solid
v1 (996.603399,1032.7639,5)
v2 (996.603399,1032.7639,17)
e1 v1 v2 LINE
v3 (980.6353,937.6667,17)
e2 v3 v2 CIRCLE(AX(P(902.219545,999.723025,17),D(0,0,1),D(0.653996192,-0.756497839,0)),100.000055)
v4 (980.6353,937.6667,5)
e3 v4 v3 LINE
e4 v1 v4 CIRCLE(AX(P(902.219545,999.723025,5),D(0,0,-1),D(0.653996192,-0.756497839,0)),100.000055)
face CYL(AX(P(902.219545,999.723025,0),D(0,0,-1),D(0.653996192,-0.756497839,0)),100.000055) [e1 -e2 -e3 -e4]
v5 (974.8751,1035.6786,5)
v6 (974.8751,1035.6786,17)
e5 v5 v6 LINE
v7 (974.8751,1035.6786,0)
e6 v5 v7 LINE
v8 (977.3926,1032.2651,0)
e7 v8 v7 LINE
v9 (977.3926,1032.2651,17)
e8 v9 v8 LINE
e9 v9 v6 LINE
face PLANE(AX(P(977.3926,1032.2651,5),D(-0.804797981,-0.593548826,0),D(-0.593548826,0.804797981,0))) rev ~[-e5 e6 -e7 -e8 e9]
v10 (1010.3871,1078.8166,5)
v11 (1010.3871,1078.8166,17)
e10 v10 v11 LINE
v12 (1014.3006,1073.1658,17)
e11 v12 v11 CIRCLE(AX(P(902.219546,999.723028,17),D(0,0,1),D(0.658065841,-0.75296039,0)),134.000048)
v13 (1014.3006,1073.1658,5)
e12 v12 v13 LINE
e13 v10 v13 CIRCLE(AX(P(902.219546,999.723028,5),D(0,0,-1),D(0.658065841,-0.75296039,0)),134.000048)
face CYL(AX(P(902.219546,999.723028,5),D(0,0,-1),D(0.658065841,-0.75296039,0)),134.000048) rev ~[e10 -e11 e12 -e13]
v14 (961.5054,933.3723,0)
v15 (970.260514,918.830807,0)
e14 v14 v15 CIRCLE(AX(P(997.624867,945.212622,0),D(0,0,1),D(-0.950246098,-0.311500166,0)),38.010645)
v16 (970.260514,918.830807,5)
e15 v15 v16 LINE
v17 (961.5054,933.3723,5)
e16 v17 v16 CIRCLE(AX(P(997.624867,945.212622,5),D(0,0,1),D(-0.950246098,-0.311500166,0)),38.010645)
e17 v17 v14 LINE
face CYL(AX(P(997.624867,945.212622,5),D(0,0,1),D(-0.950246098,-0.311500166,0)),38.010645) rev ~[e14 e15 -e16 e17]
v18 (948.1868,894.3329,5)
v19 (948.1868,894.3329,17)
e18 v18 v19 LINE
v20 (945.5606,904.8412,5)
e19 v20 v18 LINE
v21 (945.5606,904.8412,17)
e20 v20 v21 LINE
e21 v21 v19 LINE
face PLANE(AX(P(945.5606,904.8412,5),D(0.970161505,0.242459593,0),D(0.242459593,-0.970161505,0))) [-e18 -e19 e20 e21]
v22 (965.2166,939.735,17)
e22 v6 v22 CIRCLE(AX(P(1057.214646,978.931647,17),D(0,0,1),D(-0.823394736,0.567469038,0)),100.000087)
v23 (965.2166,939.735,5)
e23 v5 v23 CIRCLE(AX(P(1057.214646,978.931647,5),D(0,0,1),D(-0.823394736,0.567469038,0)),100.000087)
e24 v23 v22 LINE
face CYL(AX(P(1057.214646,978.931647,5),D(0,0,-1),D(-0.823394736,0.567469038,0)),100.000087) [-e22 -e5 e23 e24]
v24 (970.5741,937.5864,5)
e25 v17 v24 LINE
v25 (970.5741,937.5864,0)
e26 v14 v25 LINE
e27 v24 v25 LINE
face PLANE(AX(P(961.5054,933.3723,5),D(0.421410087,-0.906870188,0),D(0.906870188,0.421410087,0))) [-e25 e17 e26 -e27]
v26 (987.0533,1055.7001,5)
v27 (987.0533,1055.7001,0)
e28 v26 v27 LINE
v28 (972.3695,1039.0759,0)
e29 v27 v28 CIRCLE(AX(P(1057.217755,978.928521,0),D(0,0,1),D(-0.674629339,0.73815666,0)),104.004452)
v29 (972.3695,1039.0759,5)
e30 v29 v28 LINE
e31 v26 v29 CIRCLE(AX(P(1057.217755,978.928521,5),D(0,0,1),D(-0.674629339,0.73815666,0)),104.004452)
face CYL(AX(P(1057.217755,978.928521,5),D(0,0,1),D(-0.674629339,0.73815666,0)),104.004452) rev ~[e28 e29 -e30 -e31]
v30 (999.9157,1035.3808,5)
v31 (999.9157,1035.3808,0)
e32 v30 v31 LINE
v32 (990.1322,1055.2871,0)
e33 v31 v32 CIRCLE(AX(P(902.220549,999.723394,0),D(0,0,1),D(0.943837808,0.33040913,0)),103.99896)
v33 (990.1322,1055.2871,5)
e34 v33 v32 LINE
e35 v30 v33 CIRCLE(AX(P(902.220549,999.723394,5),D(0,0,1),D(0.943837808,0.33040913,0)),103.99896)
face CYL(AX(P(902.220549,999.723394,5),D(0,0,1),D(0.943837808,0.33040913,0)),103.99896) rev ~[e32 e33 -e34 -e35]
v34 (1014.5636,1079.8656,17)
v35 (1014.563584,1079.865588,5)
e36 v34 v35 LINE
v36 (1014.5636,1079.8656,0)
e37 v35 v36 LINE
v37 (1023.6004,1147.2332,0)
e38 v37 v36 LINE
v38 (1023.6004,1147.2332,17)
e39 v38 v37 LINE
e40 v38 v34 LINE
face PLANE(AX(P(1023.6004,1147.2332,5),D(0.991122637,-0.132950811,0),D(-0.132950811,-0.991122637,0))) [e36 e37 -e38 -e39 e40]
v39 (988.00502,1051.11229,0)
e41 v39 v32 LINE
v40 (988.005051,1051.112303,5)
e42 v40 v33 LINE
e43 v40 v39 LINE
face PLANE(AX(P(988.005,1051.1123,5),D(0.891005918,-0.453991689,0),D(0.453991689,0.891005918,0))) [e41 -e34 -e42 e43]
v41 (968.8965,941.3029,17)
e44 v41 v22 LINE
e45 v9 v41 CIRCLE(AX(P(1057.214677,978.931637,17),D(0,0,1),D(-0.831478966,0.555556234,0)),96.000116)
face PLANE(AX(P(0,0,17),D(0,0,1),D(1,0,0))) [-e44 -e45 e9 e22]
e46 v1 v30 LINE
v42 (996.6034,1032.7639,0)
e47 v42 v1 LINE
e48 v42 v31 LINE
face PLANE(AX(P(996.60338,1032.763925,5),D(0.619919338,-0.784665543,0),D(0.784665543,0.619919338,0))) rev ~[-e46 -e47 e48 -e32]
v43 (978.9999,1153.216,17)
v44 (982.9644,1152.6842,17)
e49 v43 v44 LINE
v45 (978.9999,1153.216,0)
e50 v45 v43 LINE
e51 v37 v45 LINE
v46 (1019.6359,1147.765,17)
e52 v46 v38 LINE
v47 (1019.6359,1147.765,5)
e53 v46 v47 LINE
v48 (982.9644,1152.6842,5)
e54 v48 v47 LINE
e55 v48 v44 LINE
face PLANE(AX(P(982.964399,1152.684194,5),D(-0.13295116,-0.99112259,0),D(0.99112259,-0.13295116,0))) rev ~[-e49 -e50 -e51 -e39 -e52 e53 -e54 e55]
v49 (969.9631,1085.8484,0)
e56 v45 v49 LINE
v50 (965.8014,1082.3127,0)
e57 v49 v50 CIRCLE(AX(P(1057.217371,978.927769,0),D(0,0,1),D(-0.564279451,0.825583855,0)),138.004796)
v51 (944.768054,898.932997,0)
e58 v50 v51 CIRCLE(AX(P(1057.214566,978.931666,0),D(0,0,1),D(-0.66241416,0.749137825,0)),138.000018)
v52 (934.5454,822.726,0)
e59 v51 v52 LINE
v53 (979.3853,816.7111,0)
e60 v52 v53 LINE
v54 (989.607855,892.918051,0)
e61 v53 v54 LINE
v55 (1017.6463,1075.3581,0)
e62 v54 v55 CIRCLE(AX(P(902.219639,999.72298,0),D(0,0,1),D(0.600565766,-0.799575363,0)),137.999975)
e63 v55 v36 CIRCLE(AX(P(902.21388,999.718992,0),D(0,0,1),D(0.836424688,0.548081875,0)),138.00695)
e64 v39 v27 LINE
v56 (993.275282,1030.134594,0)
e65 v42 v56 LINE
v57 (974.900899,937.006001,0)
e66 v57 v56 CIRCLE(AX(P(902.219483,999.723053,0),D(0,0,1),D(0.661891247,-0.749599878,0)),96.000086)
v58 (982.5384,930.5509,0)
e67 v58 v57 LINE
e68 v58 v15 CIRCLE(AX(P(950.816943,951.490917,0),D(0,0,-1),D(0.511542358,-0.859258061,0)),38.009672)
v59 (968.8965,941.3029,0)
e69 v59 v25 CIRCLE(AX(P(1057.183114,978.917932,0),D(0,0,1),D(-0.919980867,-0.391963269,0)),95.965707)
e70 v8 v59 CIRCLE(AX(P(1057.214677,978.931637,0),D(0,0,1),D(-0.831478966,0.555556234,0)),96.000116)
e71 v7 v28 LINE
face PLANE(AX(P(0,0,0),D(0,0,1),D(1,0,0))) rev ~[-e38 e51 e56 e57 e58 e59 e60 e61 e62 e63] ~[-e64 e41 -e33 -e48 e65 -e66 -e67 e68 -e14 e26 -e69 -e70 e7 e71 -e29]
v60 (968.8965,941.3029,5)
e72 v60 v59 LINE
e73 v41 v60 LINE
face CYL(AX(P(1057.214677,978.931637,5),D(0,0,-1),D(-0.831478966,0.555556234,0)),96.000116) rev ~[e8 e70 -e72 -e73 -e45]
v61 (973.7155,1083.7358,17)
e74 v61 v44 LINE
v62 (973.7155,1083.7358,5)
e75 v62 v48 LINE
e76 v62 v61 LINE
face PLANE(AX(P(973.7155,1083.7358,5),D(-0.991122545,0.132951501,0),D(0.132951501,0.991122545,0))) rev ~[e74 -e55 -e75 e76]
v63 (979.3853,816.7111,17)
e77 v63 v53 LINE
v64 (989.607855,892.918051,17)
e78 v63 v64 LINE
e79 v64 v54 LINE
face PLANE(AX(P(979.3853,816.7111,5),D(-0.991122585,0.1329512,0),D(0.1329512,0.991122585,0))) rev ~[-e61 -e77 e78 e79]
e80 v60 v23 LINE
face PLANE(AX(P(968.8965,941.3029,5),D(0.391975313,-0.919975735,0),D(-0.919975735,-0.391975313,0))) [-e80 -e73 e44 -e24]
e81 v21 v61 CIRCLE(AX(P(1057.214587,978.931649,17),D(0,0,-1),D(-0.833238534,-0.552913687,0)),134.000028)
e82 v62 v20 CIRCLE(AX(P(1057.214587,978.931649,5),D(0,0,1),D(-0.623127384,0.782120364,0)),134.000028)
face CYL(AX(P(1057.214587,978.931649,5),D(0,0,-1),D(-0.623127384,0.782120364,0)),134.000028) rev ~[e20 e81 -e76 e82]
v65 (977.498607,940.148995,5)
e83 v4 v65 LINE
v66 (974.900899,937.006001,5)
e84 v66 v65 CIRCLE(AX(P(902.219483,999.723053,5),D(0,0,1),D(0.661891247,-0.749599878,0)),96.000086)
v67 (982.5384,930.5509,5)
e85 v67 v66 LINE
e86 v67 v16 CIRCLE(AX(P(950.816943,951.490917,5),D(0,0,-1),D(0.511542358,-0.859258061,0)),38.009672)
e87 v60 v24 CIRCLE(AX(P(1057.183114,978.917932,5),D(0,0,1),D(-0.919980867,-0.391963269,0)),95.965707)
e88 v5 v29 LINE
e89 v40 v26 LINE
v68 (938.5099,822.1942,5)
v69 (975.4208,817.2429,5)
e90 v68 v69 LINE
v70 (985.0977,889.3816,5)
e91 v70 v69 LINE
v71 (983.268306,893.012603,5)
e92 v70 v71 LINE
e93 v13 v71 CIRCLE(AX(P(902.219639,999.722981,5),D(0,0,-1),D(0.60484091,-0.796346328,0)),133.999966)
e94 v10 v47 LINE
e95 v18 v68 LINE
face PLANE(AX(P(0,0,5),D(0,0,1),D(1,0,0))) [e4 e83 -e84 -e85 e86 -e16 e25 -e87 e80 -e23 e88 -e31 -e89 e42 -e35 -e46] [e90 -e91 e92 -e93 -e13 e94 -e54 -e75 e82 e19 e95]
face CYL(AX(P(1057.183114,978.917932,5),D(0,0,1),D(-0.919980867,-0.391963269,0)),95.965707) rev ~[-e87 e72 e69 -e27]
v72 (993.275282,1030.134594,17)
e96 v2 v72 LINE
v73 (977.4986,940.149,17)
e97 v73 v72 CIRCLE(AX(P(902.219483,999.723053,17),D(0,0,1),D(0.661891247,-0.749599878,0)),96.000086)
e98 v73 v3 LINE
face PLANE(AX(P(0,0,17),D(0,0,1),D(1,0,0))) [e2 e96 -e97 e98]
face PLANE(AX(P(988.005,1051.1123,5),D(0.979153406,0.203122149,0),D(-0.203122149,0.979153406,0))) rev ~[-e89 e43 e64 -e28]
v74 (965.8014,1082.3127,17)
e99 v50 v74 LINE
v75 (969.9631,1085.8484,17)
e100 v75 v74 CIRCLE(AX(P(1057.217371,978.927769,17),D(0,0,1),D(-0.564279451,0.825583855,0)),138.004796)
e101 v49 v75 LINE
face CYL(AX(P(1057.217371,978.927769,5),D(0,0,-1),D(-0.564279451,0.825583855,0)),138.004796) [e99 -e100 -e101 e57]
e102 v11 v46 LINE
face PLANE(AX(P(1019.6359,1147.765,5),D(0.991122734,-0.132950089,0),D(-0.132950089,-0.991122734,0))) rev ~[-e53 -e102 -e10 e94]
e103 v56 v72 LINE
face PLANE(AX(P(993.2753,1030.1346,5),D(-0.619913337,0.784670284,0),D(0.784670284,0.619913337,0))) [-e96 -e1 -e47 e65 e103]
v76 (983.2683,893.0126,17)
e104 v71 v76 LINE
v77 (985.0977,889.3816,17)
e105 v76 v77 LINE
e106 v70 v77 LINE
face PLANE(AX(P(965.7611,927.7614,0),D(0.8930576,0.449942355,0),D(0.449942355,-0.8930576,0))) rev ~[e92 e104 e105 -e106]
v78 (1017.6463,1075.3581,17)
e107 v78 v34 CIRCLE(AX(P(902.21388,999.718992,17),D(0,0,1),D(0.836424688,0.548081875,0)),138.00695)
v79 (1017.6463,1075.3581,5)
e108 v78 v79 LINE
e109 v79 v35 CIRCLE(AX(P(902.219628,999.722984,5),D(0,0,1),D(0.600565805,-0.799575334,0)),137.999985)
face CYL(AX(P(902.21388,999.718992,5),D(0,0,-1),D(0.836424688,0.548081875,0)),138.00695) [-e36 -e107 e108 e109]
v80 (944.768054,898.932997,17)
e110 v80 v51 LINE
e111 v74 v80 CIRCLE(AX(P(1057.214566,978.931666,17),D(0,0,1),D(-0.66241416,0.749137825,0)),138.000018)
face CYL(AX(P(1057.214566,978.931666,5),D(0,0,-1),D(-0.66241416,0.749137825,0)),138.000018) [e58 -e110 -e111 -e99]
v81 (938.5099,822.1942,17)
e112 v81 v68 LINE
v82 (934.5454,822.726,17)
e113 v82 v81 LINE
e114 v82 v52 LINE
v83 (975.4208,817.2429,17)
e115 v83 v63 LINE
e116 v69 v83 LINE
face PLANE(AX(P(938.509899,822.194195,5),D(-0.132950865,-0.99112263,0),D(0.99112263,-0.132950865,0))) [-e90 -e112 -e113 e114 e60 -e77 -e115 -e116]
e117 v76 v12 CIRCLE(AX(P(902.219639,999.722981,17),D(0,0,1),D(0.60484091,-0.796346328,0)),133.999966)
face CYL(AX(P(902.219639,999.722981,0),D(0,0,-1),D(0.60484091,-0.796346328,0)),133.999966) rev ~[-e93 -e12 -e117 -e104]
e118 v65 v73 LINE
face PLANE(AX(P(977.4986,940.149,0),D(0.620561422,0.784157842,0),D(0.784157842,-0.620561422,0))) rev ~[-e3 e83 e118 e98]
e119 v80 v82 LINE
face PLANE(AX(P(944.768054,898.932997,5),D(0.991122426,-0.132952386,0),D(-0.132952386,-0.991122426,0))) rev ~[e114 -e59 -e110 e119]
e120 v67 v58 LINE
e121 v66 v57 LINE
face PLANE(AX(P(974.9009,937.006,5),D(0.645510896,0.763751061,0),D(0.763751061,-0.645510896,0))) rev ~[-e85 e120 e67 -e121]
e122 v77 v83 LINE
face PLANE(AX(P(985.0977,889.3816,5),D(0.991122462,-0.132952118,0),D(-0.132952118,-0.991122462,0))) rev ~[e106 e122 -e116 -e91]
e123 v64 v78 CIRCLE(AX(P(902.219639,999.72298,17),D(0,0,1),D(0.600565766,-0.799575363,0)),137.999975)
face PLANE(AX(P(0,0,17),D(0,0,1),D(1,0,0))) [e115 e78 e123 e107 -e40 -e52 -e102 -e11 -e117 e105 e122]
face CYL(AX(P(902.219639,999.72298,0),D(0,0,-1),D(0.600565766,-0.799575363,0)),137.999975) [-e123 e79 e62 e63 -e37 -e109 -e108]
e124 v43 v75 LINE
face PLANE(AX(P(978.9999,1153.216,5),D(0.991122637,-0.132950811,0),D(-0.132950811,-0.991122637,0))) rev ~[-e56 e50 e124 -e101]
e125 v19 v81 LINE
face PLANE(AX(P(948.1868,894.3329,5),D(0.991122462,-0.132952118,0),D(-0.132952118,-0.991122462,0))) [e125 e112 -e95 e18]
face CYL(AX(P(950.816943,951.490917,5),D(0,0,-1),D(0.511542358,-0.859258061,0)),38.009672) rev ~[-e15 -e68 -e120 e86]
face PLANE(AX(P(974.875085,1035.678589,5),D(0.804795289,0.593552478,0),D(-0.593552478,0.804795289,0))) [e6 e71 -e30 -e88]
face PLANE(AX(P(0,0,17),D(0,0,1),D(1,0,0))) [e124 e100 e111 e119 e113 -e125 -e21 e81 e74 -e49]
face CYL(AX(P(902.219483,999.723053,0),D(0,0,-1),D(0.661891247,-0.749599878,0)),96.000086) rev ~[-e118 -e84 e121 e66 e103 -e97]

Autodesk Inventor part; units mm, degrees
ref_plane "YZ Plane" through (0, 0, 0) normal (1, 0, 0) x (0, 1, 0)
ref_plane "XZ Plane" through (0, 0, 0) normal (0, 1, 0) x (-1, 0, 0)
ref_plane "XY Plane" through (0, 0, 0) normal (0, 0, 1) x (1, 0, 0)
sketch "Sketch1" plane through (0, 0, 0) normal (0, 0, 1) x (1, 0, 0)
  arc A0 (967.6192, 924.0732) -> (967.7873, 1075.2272) centre (902.2196, 999.723) ccw
  arc A1 (983.2683, 893.0126) -> (983.4428, 1106.3006) centre (902.2196, 999.723) ccw
  line L0 (965.7611, 927.7614) -> (985.0977, 889.3816)
  line L1 (966.6908, 925.9161) -> (1011.6908, 925.9161) construction
  arc A2 (985.0977, 889.3816) -> (985.2727, 1109.9327) centre (902.2196, 999.723) ccw
  line L2 (965.9281, 1071.5369) -> (985.2727, 1109.9327)
  arc A3 (965.7611, 927.7614) -> (965.9281, 1071.5369) centre (902.2196, 999.723) ccw
  line L3 (977.4986, 940.149) -> (980.6353, 937.6667)
  point P0 (0, 0)
  point P1 (983.9681, 893.1)
  point P2 (990.6031, 1100.4422)
  point P3 (968.1775, 1074.8866)
  dimension "d28" = 100
  dimension "d33" = 63.26
  dimension "d34" = 4
  dimension "d40" = 4
  dimension "d41" = 4
extrude "Extrusion6" add sketch "Sketch1" along normal blind 5
extrude "Extrusion7" add sketch "Sketch1" along normal blind 17 contours L3 A3 L2 A0 | A1 L2 A2 L0
sketch "Sketch5" plane through (0, 0, 5) normal (0, 0, 1) x (1, 0, 0)
  arc A0 (965.7611, 927.7614) -> (977.4986, 940.149) centre (902.2196, 999.723) ccw projected
  line L0 (965.7611, 927.7614) -> (970.2605, 918.8308)
  line L1 (965.7611, 927.7614) -> (983.2683, 893.0126) projected
  line L2 (977.4986, 940.149) -> (985.1361, 933.6938)
  arc A1 (965.7611, 927.7614) -> (977.4986, 940.149) centre (902.2196, 999.723) ccw
  arc A2 (965.7611, 927.7614) -> (974.9009, 937.006) centre (902.2196, 999.723) ccw
  line L3 (974.9009, 937.006) -> (982.5384, 930.5509)
  arc A3 (970.2605, 918.8308) -> (982.5384, 930.5509) centre (950.8165, 951.4915) ccw
  point P0 (0, 0)
  dimension "d42" = 10
  dimension "d43" = 10
  dimension "d46" = 13
  dimension "d47" = 10
extrude "Extrusion8" cut sketch "Sketch5" along normal through all both and the other way through all
sketch "Sketch6" plane through (0, 0, 5) normal (0, 0, 1) x (1, 0, 0)
  arc A0 (974.9009, 937.006) -> (965.9281, 1071.5369) centre (902.2196, 999.723) ccw projected
  arc A1 (985.0977, 889.3816) -> (985.2727, 1109.9327) centre (902.2196, 999.723) ccw projected
  line L0 (985.8441, 1046.8712) -> (1027.8759, 1046.8712) construction
  line L1 (985.2727, 1109.9327) -> (965.9281, 1071.5369) projected
  line L2 (965.9281, 1071.5369) -> (985.2727, 1109.9327)
  arc A2 (985.8441, 1046.8712) -> (965.9281, 1071.5369) centre (902.2196, 999.723) ccw
  arc A3 (1007.3627, 1089.1038) -> (985.2727, 1109.9327) centre (902.2196, 999.723) ccw
  line L3 (985.8441, 1046.8712) -> (1007.3627, 1089.1038)
  point P0 (0, 0)
  dimension "d51" = 63
extrude "Extrusion9" cut sketch "Sketch6" along normal through all both and the other way through all
sketch "Sketch7" plane through (0, 0, 5) normal (0, 0, 1) x (1, 0, 0)
  arc A0 (977.4782, 940.1232) -> (985.8441, 1046.8712) centre (902.2196, 999.723) ccw
  arc A1 (980.614, 937.6399) -> (988.005, 1051.1123) centre (902.2196, 999.723) ccw
  arc A2 (974.9009, 937.006) -> (985.8441, 1046.8712) centre (902.2196, 999.723) ccw projected
  line L0 (985.8441, 1046.8712) -> (988.005, 1051.1123)
  line L1 (985.8441, 1046.8712) -> (1007.3627, 1089.1038) projected
  line L2 (993.2753, 1030.1346) -> (996.6034, 1032.7639)
  point P0 (0, 0)
  dimension "d52" = 4
extrude "Extrusion10" cut sketch "Sketch7" along normal through all both and the other way through all
sketch "Sketch8" plane through (0, 0, 17) normal (0, 0, 1) x (1, 0, 0)
  arc A0 (983.2683, 893.0126) -> (1005.3901, 1085.2324) centre (902.2196, 999.723) ccw projected
  arc A1 (1014.3006, 1073.1658) -> (1005.3901, 1085.2324) centre (902.2196, 999.723) ccw
  line L0 (988.005, 1051.1123) -> (1007.3627, 1089.1038) projected
  line L1 (1005.3901, 1085.2324) -> (1007.3627, 1089.1038)
  line L2 (1014.3006, 1073.1658) -> (1017.6463, 1075.3581)
  arc A2 (985.0977, 889.3816) -> (1007.3627, 1089.1038) centre (902.2196, 999.723) ccw projected
  arc A3 (1017.6463, 1075.3581) -> (1007.3627, 1089.1038) centre (902.2196, 999.723) ccw
  point P0 (0, 0)
  dimension "d55" = 15
  dimension "d56" = 4
  dimension "d57" = 138
extrude "Extrusion11" cut sketch "Sketch8" against normal blind 12
sketch "Sketch10" plane through (0, 0, 5) normal (0, 0, 1) x (1, 0, 0)
  line L0 (993.2753, 1030.1346) -> (996.6034, 1032.7639) projected
  arc A0 (996.6034, 1032.7639) -> (988.005, 1051.1123) centre (902.2196, 999.723) ccw projected
  line L1 (988.005, 1051.1123) -> (1007.3627, 1089.1038) projected
  arc A1 (1017.6463, 1075.3581) -> (1007.3627, 1089.1038) centre (902.2196, 999.723) ccw projected
  line L2 (1014.3006, 1073.1658) -> (1017.6463, 1075.3581) projected
  arc A2 (983.2683, 893.0126) -> (1014.3006, 1073.1658) centre (902.2196, 999.723) ccw projected
  line L3 (983.2683, 893.0126) -> (970.2605, 918.8308) projected
  arc A3 (970.2605, 918.8308) -> (982.5384, 930.5509) centre (950.8165, 951.4915) ccw projected
  line L4 (982.5384, 930.5509) -> (974.9009, 937.006) projected
  arc A4 (974.9009, 937.006) -> (977.4986, 940.149) centre (902.2196, 999.723) ccw projected
  arc A5 (977.4986, 940.149) -> (993.2753, 1030.1346) centre (902.2196, 999.723) ccw projected
  arc A6 (980.6353, 937.6667) -> (996.6034, 1032.7639) centre (902.2196, 999.723) ccw projected
  line L5 (977.4986, 940.149) -> (980.6353, 937.6667) projected
  arc A7 (985.0977, 889.3816) -> (1017.6463, 1075.3581) centre (902.2196, 999.723) ccw projected
  line L6 (985.0977, 889.3816) -> (983.2683, 893.0126) projected
  line L7 (970.2605, 918.8308) -> (988.005, 1051.1123)
  line L8 (977.3926, 1032.2651) -> (974.8751, 1035.6786)
  arc A8 (988.005, 1051.1123) -> (974.8751, 1035.6786) centre (1057.2145, 978.9317) ccw
  line L9 (988.005, 1051.1123) -> (979.3441, 1092.8623)
  arc A9 (979.3441, 1092.8623) -> (965.8014, 1082.3127) centre (1057.2145, 978.9317) ccw
  line L10 (968.4511, 1079.3162) -> (965.8014, 1082.3127)
  arc A10 (973.7155, 1083.7358) -> (945.5606, 904.8412) centre (1057.2145, 978.9317) ccw
  line L11 (950.9084, 897.3534) -> (970.2605, 918.8308)
  arc A11 (961.5054, 933.3723) -> (970.2605, 918.8308) centre (997.6246, 945.2125) ccw
  line L12 (961.5054, 933.3723) -> (970.5741, 937.5864)
  arc A12 (968.8965, 941.3029) -> (970.5741, 937.5864) centre (1057.2145, 978.9317) ccw
  arc A13 (977.3926, 1032.2651) -> (968.8965, 941.3029) centre (1057.2145, 978.9317) ccw
  arc A14 (974.8751, 1035.6786) -> (965.2166, 939.735) centre (1057.2145, 978.9317) ccw
  line L13 (968.8965, 941.3029) -> (965.2166, 939.735)
  arc A15 (965.8014, 1082.3127) -> (948.1868, 894.3329) centre (1057.2145, 978.9317) ccw
  line L14 (948.1868, 894.3329) -> (950.9084, 897.3534)
  line L15 (970.2605, 918.8308) -> (948.1868, 894.3329)
  line L16 (970.2605, 918.8308) -> (985.0977, 889.3816)
  line L17 (985.0977, 889.3816) -> (975.4208, 817.2429)
  line L18 (948.1868, 894.3329) -> (938.5099, 822.1942)
  line L19 (945.5606, 904.8412) -> (934.5454, 822.726)
  line L20 (934.5454, 822.726) -> (979.3853, 816.7111)
  line L21 (979.3853, 816.7111) -> (990.4004, 898.8263)
  line L22 (945.5606, 904.8412) -> (948.1868, 894.3329)
  line L23 (985.0977, 889.3816) -> (990.4004, 898.8263)
  line L24 (988.005, 1051.1123) -> (1007.3627, 1089.1038) projected
  line L25 (988.005, 1051.1123) -> (979.3441, 1092.8623)
  line L26 (988.005, 1051.1123) -> (1007.3627, 1089.1038)
  line L27 (978.9999, 1153.216) -> (1023.6004, 1147.2332)
  line L28 (970.2605, 918.8308) -> (988.005, 1051.1123)
  line L29 (978.9999, 1153.216) -> (969.9631, 1085.8484)
  line L30 (1023.6004, 1147.2332) -> (1014.5636, 1079.8656)
  line L31 (973.7155, 1083.7358) -> (982.9644, 1152.6842)
  line L32 (1019.6359, 1147.765) -> (1010.3871, 1078.8166)
  arc A16 (990.4004, 898.8263) -> (1010.3871, 1078.8166) centre (902.2196, 999.723) ccw
  arc A17 (996.6034, 1032.7639) -> (988.005, 1051.1123) centre (902.2196, 999.723) ccw projected
  arc A18 (996.6034, 1032.7639) -> (988.005, 1051.1123) centre (902.2196, 999.723) ccw
  arc A19 (1000.3787, 1034.0856) -> (990.1322, 1055.2871) centre (902.2196, 999.723) ccw
  line L33 (993.2753, 1030.1346) -> (999.9157, 1035.3808)
  line L34 (988.005, 1051.1123) -> (990.1322, 1055.2871)
  arc A20 (988.005, 1051.1123) -> (974.8751, 1035.6786) centre (1057.2145, 978.9317) ccw
  line L35 (988.005, 1051.1123) -> (979.3441, 1092.8623)
  arc A21 (987.0533, 1055.7001) -> (971.5815, 1037.9485) centre (1057.2145, 978.9317) ccw
  line L36 (977.3926, 1032.2651) -> (972.3695, 1039.0759)
  point P0 (0, 0)
  point P1 (982.4326, 1148.7197)
  point P2 (1018.8217, 1141.6953)
  point P3 (980.2267, 1088.6079)
  point P4 (1005.3901, 1085.2324)
  point P5 (1011.1435, 1084.4555)
  point P6 (944.768, 898.933)
  point P7 (989.6079, 892.9181)
  point P8 (1001.3002, 1150.2246)
  point P9 (956.9654, 819.7185)
  dimension "d60" = 132.2815
  dimension "d61" = 4
  dimension "d62" = 4
  dimension "d64" = 45
  dimension "d65" = 22.5
  dimension "d66" = 4
  dimension "d74" = 100
  dimension "d75" = 100
  dimension "d76" = 4
extrude "Extrusion12" add sketch "Sketch10" against normal blind 5 contours L9 A9 L31 L27 L32 A1 L1 | A8 L36 A21 L9 | L3 L6 L17 L20 L18 L14 L11 | L11 L14 L22 A10 L31 A9 L9 A21 L36 A14 L13 A12 L12 A11
extrude "Extrusion13" add sketch "Sketch10" along normal blind 12 and the other way blind 5 contours L8 A13 L13 A14 | L32 L27 L30 A1 | A1 L2 A16 L32 | A7 L21 L20 L17 | L18 L20 L19 A15 | A15 L19 L22 | L31 A10 L10 A9 | A9 L29 L27 L31 | A15 L10 A10 L19
extrude "Extrusion14" cut sketch "Sketch10" against normal blind 12 contours A0 L1 A19 L33 | A8 L36 A21 L9
properties part number "outside3"
